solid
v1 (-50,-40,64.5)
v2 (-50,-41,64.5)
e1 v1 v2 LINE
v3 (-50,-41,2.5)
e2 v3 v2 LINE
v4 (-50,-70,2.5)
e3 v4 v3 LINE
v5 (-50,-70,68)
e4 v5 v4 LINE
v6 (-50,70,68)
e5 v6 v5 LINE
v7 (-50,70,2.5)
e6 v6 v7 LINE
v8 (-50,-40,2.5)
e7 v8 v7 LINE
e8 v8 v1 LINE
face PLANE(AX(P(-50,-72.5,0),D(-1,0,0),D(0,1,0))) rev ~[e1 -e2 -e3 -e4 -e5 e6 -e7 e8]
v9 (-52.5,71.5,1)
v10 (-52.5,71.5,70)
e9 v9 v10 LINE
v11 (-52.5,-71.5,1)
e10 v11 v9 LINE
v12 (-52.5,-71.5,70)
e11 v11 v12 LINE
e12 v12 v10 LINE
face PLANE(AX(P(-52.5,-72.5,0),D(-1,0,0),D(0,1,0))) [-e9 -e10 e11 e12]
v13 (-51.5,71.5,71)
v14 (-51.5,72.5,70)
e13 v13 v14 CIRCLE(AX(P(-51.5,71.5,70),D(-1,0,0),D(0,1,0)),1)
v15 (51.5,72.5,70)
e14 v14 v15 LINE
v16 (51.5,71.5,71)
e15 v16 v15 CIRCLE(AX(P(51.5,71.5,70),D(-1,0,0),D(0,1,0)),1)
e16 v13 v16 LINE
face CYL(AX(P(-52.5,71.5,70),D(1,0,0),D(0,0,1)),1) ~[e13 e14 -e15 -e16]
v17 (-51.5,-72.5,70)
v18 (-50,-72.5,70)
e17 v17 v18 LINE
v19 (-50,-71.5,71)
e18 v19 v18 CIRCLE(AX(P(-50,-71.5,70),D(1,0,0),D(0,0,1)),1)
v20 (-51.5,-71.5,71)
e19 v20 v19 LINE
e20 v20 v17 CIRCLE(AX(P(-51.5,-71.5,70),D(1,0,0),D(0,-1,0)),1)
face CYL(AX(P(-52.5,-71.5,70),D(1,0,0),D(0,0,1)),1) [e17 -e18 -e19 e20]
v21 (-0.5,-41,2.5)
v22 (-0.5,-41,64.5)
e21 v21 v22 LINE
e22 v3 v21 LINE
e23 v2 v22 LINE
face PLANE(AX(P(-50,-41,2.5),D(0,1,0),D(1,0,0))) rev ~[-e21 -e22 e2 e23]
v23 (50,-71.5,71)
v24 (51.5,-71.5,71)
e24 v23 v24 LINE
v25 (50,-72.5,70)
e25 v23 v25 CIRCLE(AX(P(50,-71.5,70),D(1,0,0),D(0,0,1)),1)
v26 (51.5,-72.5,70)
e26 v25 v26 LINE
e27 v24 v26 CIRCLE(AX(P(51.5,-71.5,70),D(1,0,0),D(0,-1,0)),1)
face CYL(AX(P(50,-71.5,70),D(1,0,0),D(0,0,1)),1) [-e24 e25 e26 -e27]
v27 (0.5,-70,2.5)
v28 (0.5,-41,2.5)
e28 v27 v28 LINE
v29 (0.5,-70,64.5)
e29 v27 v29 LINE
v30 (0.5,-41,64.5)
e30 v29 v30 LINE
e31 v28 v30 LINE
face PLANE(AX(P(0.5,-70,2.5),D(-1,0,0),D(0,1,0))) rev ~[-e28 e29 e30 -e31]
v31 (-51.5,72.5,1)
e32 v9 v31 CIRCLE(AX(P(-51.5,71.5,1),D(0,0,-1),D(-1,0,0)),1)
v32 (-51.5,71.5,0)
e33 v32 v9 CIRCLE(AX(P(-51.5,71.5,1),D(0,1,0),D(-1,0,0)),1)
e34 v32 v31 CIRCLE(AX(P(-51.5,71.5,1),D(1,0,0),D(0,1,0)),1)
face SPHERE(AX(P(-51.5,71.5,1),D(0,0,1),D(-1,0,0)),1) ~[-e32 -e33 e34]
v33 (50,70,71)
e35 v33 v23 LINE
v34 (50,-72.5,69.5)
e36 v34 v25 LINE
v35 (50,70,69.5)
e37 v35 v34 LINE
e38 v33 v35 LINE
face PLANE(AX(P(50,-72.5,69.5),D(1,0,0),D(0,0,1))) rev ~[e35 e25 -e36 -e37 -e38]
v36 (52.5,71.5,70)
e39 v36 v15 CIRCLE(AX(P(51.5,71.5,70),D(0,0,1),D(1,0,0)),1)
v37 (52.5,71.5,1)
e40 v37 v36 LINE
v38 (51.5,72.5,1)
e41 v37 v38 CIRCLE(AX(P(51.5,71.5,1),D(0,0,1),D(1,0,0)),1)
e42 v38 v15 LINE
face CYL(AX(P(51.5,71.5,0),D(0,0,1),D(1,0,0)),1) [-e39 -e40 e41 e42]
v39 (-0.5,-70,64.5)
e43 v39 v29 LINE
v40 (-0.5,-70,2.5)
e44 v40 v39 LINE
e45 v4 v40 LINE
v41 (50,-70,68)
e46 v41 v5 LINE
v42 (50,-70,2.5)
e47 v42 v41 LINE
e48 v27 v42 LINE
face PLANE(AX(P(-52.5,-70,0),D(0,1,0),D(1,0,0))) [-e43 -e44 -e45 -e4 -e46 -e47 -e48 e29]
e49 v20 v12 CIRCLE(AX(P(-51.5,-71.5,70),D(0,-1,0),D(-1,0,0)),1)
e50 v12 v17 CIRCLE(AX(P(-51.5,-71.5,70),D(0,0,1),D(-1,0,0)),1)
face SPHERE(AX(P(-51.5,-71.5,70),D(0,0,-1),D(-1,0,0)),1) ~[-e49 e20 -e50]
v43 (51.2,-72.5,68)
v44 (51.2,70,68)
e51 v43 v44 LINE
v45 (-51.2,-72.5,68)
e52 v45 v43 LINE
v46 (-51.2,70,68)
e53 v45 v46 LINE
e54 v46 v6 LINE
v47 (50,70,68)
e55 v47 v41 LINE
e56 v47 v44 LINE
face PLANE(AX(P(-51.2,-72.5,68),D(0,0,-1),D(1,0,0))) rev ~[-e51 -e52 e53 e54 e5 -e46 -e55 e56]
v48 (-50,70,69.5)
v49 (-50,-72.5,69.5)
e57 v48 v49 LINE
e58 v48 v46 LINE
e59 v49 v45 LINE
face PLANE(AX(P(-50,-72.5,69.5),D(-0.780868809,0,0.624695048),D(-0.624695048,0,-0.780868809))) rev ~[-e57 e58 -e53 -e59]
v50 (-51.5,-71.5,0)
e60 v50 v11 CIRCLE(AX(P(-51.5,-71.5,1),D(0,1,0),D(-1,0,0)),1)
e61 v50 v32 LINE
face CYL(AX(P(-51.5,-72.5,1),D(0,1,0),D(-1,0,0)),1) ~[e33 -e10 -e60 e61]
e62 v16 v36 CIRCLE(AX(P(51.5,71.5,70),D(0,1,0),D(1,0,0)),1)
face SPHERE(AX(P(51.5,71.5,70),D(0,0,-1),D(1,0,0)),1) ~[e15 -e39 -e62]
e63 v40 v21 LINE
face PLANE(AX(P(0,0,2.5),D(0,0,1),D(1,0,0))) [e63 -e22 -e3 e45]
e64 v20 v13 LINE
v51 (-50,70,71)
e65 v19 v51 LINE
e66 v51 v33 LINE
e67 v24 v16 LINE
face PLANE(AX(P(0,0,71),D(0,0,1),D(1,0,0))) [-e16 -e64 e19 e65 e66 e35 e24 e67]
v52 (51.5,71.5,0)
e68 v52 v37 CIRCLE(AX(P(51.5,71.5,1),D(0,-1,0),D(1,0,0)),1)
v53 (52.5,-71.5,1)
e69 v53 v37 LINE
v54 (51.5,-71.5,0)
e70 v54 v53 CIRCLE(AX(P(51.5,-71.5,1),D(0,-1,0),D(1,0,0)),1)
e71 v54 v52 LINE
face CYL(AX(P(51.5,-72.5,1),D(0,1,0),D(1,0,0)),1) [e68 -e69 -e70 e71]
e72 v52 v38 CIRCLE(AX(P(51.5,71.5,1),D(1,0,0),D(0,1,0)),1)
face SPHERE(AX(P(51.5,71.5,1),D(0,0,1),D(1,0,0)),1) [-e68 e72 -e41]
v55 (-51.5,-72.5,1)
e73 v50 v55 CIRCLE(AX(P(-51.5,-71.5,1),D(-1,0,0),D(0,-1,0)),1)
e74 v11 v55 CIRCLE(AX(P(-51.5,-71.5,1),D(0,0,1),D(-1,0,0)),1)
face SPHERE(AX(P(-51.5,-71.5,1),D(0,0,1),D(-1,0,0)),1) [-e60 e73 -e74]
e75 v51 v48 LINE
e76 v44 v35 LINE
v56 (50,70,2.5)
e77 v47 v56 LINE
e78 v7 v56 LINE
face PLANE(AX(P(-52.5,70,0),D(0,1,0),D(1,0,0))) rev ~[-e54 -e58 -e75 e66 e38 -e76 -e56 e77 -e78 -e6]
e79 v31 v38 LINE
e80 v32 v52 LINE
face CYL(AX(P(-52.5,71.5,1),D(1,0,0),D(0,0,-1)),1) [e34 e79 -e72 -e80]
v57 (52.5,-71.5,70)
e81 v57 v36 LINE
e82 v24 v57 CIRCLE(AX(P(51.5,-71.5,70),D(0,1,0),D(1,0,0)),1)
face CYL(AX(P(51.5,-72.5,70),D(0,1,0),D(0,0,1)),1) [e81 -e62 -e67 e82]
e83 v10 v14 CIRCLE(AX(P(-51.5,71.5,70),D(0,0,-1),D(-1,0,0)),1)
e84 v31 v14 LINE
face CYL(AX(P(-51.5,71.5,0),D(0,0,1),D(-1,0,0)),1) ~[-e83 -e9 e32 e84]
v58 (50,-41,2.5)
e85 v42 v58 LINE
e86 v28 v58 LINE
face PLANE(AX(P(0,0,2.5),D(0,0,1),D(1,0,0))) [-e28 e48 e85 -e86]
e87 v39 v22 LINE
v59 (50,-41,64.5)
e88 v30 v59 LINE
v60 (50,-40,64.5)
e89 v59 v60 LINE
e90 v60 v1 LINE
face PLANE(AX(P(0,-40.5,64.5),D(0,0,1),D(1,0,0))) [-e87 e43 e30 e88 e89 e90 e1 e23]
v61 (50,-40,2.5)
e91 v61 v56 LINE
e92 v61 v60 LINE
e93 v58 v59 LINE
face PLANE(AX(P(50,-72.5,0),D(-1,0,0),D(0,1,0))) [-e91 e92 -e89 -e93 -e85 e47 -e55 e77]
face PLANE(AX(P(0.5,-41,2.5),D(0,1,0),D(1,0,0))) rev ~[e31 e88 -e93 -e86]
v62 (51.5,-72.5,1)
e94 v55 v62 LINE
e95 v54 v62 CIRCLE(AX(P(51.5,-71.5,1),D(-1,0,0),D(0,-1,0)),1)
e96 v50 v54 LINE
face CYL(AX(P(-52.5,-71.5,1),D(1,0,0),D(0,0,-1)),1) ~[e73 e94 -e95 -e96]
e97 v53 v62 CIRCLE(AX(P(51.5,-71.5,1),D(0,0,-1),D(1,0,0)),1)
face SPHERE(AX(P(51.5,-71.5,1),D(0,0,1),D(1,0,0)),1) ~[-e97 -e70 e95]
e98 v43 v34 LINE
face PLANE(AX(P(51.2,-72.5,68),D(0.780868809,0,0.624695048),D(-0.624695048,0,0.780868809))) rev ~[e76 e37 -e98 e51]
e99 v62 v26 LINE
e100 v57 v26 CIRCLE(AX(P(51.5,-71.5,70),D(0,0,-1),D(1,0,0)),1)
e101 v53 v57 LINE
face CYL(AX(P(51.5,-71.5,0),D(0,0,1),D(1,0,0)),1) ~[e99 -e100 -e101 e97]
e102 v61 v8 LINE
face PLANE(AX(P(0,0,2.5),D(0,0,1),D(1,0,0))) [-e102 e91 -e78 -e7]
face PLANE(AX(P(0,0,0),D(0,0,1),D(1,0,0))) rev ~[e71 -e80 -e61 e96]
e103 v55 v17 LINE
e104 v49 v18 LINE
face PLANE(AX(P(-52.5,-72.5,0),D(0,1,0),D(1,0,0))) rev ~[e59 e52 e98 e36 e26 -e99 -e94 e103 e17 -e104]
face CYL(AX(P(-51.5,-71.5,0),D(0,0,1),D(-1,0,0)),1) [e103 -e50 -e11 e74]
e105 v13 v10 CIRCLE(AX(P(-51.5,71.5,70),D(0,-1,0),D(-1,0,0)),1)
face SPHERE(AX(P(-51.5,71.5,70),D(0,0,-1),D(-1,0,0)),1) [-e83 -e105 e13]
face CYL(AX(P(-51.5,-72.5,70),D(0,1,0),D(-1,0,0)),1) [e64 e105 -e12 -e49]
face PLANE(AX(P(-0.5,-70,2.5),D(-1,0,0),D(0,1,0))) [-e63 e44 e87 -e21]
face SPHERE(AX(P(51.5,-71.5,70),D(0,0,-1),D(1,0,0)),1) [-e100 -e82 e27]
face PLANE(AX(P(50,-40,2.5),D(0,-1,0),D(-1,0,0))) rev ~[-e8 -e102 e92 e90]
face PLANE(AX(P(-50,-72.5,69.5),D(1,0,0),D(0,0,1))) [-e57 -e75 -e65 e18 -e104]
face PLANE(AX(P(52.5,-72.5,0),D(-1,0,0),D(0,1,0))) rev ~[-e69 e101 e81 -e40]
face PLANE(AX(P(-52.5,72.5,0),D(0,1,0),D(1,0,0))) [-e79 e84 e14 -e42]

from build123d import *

# Parameters (mm, degrees)
F0_W          = 105
F0_H          = 145
F1_DEPTH      = 71
F2_T          = -2.5
F3_W          = 1
F3_H          = 29
F4_DEPTH      = 62
F5_W          = 50
F5_H          = 1.5
F6_DEPTH      = 142.5
F6_DEPTH_BACK = 268
F7_R          = 1


# Not quite as in the source:
# - an extrude ends at something that could not be found from the text; its depth is read off the source's solid


with BuildPart() as f1:
    # F0 (on Top) → F1 (new body)
    with BuildSketch(Plane.XY):
        Rectangle(F0_W, F0_H)
    extrude(amount=F1_DEPTH)

    # F2
    f2_openings = [f1.faces().sort_by_distance(p)[0] for p in [
        (0, 0, 71),
    ]]
    offset(amount=F2_T, openings=f2_openings)

    # F3 (on face) → F4 (join)
    with BuildSketch(Plane.XY.offset(2.5)):
        Polygon((-50, -40), (-50, -41), (-0.5, -41), (0.5, -41), (50, -41), (50, -40), align=None)
        with Locations((0, -55.5)):
            Rectangle(F3_W, F3_H)
    extrude(amount=F4_DEPTH)

    # F5 (on face) → F6 (cut, two sides)
    with BuildSketch(Plane.XZ.offset(72.5)) as f6_sk:
        with Locations((25, 70.25)):
            Rectangle(F5_W, F5_H)
        with Locations((-25, 70.25)):
            Rectangle(F5_W, F5_H)
        Polygon((50, 69.5), (0, 69.5), (0, 68), (51.2, 68), align=None)
        Polygon((0, 68), (0, 69.5), (-50, 69.5), (-51.2, 68), align=None)
    extrude(amount=-F6_DEPTH, mode=Mode.SUBTRACT)
    extrude(f6_sk.sketch, amount=F6_DEPTH_BACK, mode=Mode.SUBTRACT)

    # F7
    f7_edges = [f1.edges().sort_by_distance(p)[0] for p in [
        (52.5, -72.5, 35.5),
        (52.5, 72.5, 35.5),
        (52.5, 0, 0),
        (52.5, 0, 71),
        (-52.5, 72.5, 35.5),
        (-52.5, -72.5, 35.5),
        (-52.5, 0, 0),
        (-52.5, 0, 71),
        (0, 72.5, 0),
        (0, 72.5, 71),
        (0, -72.5, 0),
        (-51.25, -72.5, 71),
        (51.25, -72.5, 71),
    ]]
    fillet(f7_edges, radius=F7_R)


solid = f1.part
